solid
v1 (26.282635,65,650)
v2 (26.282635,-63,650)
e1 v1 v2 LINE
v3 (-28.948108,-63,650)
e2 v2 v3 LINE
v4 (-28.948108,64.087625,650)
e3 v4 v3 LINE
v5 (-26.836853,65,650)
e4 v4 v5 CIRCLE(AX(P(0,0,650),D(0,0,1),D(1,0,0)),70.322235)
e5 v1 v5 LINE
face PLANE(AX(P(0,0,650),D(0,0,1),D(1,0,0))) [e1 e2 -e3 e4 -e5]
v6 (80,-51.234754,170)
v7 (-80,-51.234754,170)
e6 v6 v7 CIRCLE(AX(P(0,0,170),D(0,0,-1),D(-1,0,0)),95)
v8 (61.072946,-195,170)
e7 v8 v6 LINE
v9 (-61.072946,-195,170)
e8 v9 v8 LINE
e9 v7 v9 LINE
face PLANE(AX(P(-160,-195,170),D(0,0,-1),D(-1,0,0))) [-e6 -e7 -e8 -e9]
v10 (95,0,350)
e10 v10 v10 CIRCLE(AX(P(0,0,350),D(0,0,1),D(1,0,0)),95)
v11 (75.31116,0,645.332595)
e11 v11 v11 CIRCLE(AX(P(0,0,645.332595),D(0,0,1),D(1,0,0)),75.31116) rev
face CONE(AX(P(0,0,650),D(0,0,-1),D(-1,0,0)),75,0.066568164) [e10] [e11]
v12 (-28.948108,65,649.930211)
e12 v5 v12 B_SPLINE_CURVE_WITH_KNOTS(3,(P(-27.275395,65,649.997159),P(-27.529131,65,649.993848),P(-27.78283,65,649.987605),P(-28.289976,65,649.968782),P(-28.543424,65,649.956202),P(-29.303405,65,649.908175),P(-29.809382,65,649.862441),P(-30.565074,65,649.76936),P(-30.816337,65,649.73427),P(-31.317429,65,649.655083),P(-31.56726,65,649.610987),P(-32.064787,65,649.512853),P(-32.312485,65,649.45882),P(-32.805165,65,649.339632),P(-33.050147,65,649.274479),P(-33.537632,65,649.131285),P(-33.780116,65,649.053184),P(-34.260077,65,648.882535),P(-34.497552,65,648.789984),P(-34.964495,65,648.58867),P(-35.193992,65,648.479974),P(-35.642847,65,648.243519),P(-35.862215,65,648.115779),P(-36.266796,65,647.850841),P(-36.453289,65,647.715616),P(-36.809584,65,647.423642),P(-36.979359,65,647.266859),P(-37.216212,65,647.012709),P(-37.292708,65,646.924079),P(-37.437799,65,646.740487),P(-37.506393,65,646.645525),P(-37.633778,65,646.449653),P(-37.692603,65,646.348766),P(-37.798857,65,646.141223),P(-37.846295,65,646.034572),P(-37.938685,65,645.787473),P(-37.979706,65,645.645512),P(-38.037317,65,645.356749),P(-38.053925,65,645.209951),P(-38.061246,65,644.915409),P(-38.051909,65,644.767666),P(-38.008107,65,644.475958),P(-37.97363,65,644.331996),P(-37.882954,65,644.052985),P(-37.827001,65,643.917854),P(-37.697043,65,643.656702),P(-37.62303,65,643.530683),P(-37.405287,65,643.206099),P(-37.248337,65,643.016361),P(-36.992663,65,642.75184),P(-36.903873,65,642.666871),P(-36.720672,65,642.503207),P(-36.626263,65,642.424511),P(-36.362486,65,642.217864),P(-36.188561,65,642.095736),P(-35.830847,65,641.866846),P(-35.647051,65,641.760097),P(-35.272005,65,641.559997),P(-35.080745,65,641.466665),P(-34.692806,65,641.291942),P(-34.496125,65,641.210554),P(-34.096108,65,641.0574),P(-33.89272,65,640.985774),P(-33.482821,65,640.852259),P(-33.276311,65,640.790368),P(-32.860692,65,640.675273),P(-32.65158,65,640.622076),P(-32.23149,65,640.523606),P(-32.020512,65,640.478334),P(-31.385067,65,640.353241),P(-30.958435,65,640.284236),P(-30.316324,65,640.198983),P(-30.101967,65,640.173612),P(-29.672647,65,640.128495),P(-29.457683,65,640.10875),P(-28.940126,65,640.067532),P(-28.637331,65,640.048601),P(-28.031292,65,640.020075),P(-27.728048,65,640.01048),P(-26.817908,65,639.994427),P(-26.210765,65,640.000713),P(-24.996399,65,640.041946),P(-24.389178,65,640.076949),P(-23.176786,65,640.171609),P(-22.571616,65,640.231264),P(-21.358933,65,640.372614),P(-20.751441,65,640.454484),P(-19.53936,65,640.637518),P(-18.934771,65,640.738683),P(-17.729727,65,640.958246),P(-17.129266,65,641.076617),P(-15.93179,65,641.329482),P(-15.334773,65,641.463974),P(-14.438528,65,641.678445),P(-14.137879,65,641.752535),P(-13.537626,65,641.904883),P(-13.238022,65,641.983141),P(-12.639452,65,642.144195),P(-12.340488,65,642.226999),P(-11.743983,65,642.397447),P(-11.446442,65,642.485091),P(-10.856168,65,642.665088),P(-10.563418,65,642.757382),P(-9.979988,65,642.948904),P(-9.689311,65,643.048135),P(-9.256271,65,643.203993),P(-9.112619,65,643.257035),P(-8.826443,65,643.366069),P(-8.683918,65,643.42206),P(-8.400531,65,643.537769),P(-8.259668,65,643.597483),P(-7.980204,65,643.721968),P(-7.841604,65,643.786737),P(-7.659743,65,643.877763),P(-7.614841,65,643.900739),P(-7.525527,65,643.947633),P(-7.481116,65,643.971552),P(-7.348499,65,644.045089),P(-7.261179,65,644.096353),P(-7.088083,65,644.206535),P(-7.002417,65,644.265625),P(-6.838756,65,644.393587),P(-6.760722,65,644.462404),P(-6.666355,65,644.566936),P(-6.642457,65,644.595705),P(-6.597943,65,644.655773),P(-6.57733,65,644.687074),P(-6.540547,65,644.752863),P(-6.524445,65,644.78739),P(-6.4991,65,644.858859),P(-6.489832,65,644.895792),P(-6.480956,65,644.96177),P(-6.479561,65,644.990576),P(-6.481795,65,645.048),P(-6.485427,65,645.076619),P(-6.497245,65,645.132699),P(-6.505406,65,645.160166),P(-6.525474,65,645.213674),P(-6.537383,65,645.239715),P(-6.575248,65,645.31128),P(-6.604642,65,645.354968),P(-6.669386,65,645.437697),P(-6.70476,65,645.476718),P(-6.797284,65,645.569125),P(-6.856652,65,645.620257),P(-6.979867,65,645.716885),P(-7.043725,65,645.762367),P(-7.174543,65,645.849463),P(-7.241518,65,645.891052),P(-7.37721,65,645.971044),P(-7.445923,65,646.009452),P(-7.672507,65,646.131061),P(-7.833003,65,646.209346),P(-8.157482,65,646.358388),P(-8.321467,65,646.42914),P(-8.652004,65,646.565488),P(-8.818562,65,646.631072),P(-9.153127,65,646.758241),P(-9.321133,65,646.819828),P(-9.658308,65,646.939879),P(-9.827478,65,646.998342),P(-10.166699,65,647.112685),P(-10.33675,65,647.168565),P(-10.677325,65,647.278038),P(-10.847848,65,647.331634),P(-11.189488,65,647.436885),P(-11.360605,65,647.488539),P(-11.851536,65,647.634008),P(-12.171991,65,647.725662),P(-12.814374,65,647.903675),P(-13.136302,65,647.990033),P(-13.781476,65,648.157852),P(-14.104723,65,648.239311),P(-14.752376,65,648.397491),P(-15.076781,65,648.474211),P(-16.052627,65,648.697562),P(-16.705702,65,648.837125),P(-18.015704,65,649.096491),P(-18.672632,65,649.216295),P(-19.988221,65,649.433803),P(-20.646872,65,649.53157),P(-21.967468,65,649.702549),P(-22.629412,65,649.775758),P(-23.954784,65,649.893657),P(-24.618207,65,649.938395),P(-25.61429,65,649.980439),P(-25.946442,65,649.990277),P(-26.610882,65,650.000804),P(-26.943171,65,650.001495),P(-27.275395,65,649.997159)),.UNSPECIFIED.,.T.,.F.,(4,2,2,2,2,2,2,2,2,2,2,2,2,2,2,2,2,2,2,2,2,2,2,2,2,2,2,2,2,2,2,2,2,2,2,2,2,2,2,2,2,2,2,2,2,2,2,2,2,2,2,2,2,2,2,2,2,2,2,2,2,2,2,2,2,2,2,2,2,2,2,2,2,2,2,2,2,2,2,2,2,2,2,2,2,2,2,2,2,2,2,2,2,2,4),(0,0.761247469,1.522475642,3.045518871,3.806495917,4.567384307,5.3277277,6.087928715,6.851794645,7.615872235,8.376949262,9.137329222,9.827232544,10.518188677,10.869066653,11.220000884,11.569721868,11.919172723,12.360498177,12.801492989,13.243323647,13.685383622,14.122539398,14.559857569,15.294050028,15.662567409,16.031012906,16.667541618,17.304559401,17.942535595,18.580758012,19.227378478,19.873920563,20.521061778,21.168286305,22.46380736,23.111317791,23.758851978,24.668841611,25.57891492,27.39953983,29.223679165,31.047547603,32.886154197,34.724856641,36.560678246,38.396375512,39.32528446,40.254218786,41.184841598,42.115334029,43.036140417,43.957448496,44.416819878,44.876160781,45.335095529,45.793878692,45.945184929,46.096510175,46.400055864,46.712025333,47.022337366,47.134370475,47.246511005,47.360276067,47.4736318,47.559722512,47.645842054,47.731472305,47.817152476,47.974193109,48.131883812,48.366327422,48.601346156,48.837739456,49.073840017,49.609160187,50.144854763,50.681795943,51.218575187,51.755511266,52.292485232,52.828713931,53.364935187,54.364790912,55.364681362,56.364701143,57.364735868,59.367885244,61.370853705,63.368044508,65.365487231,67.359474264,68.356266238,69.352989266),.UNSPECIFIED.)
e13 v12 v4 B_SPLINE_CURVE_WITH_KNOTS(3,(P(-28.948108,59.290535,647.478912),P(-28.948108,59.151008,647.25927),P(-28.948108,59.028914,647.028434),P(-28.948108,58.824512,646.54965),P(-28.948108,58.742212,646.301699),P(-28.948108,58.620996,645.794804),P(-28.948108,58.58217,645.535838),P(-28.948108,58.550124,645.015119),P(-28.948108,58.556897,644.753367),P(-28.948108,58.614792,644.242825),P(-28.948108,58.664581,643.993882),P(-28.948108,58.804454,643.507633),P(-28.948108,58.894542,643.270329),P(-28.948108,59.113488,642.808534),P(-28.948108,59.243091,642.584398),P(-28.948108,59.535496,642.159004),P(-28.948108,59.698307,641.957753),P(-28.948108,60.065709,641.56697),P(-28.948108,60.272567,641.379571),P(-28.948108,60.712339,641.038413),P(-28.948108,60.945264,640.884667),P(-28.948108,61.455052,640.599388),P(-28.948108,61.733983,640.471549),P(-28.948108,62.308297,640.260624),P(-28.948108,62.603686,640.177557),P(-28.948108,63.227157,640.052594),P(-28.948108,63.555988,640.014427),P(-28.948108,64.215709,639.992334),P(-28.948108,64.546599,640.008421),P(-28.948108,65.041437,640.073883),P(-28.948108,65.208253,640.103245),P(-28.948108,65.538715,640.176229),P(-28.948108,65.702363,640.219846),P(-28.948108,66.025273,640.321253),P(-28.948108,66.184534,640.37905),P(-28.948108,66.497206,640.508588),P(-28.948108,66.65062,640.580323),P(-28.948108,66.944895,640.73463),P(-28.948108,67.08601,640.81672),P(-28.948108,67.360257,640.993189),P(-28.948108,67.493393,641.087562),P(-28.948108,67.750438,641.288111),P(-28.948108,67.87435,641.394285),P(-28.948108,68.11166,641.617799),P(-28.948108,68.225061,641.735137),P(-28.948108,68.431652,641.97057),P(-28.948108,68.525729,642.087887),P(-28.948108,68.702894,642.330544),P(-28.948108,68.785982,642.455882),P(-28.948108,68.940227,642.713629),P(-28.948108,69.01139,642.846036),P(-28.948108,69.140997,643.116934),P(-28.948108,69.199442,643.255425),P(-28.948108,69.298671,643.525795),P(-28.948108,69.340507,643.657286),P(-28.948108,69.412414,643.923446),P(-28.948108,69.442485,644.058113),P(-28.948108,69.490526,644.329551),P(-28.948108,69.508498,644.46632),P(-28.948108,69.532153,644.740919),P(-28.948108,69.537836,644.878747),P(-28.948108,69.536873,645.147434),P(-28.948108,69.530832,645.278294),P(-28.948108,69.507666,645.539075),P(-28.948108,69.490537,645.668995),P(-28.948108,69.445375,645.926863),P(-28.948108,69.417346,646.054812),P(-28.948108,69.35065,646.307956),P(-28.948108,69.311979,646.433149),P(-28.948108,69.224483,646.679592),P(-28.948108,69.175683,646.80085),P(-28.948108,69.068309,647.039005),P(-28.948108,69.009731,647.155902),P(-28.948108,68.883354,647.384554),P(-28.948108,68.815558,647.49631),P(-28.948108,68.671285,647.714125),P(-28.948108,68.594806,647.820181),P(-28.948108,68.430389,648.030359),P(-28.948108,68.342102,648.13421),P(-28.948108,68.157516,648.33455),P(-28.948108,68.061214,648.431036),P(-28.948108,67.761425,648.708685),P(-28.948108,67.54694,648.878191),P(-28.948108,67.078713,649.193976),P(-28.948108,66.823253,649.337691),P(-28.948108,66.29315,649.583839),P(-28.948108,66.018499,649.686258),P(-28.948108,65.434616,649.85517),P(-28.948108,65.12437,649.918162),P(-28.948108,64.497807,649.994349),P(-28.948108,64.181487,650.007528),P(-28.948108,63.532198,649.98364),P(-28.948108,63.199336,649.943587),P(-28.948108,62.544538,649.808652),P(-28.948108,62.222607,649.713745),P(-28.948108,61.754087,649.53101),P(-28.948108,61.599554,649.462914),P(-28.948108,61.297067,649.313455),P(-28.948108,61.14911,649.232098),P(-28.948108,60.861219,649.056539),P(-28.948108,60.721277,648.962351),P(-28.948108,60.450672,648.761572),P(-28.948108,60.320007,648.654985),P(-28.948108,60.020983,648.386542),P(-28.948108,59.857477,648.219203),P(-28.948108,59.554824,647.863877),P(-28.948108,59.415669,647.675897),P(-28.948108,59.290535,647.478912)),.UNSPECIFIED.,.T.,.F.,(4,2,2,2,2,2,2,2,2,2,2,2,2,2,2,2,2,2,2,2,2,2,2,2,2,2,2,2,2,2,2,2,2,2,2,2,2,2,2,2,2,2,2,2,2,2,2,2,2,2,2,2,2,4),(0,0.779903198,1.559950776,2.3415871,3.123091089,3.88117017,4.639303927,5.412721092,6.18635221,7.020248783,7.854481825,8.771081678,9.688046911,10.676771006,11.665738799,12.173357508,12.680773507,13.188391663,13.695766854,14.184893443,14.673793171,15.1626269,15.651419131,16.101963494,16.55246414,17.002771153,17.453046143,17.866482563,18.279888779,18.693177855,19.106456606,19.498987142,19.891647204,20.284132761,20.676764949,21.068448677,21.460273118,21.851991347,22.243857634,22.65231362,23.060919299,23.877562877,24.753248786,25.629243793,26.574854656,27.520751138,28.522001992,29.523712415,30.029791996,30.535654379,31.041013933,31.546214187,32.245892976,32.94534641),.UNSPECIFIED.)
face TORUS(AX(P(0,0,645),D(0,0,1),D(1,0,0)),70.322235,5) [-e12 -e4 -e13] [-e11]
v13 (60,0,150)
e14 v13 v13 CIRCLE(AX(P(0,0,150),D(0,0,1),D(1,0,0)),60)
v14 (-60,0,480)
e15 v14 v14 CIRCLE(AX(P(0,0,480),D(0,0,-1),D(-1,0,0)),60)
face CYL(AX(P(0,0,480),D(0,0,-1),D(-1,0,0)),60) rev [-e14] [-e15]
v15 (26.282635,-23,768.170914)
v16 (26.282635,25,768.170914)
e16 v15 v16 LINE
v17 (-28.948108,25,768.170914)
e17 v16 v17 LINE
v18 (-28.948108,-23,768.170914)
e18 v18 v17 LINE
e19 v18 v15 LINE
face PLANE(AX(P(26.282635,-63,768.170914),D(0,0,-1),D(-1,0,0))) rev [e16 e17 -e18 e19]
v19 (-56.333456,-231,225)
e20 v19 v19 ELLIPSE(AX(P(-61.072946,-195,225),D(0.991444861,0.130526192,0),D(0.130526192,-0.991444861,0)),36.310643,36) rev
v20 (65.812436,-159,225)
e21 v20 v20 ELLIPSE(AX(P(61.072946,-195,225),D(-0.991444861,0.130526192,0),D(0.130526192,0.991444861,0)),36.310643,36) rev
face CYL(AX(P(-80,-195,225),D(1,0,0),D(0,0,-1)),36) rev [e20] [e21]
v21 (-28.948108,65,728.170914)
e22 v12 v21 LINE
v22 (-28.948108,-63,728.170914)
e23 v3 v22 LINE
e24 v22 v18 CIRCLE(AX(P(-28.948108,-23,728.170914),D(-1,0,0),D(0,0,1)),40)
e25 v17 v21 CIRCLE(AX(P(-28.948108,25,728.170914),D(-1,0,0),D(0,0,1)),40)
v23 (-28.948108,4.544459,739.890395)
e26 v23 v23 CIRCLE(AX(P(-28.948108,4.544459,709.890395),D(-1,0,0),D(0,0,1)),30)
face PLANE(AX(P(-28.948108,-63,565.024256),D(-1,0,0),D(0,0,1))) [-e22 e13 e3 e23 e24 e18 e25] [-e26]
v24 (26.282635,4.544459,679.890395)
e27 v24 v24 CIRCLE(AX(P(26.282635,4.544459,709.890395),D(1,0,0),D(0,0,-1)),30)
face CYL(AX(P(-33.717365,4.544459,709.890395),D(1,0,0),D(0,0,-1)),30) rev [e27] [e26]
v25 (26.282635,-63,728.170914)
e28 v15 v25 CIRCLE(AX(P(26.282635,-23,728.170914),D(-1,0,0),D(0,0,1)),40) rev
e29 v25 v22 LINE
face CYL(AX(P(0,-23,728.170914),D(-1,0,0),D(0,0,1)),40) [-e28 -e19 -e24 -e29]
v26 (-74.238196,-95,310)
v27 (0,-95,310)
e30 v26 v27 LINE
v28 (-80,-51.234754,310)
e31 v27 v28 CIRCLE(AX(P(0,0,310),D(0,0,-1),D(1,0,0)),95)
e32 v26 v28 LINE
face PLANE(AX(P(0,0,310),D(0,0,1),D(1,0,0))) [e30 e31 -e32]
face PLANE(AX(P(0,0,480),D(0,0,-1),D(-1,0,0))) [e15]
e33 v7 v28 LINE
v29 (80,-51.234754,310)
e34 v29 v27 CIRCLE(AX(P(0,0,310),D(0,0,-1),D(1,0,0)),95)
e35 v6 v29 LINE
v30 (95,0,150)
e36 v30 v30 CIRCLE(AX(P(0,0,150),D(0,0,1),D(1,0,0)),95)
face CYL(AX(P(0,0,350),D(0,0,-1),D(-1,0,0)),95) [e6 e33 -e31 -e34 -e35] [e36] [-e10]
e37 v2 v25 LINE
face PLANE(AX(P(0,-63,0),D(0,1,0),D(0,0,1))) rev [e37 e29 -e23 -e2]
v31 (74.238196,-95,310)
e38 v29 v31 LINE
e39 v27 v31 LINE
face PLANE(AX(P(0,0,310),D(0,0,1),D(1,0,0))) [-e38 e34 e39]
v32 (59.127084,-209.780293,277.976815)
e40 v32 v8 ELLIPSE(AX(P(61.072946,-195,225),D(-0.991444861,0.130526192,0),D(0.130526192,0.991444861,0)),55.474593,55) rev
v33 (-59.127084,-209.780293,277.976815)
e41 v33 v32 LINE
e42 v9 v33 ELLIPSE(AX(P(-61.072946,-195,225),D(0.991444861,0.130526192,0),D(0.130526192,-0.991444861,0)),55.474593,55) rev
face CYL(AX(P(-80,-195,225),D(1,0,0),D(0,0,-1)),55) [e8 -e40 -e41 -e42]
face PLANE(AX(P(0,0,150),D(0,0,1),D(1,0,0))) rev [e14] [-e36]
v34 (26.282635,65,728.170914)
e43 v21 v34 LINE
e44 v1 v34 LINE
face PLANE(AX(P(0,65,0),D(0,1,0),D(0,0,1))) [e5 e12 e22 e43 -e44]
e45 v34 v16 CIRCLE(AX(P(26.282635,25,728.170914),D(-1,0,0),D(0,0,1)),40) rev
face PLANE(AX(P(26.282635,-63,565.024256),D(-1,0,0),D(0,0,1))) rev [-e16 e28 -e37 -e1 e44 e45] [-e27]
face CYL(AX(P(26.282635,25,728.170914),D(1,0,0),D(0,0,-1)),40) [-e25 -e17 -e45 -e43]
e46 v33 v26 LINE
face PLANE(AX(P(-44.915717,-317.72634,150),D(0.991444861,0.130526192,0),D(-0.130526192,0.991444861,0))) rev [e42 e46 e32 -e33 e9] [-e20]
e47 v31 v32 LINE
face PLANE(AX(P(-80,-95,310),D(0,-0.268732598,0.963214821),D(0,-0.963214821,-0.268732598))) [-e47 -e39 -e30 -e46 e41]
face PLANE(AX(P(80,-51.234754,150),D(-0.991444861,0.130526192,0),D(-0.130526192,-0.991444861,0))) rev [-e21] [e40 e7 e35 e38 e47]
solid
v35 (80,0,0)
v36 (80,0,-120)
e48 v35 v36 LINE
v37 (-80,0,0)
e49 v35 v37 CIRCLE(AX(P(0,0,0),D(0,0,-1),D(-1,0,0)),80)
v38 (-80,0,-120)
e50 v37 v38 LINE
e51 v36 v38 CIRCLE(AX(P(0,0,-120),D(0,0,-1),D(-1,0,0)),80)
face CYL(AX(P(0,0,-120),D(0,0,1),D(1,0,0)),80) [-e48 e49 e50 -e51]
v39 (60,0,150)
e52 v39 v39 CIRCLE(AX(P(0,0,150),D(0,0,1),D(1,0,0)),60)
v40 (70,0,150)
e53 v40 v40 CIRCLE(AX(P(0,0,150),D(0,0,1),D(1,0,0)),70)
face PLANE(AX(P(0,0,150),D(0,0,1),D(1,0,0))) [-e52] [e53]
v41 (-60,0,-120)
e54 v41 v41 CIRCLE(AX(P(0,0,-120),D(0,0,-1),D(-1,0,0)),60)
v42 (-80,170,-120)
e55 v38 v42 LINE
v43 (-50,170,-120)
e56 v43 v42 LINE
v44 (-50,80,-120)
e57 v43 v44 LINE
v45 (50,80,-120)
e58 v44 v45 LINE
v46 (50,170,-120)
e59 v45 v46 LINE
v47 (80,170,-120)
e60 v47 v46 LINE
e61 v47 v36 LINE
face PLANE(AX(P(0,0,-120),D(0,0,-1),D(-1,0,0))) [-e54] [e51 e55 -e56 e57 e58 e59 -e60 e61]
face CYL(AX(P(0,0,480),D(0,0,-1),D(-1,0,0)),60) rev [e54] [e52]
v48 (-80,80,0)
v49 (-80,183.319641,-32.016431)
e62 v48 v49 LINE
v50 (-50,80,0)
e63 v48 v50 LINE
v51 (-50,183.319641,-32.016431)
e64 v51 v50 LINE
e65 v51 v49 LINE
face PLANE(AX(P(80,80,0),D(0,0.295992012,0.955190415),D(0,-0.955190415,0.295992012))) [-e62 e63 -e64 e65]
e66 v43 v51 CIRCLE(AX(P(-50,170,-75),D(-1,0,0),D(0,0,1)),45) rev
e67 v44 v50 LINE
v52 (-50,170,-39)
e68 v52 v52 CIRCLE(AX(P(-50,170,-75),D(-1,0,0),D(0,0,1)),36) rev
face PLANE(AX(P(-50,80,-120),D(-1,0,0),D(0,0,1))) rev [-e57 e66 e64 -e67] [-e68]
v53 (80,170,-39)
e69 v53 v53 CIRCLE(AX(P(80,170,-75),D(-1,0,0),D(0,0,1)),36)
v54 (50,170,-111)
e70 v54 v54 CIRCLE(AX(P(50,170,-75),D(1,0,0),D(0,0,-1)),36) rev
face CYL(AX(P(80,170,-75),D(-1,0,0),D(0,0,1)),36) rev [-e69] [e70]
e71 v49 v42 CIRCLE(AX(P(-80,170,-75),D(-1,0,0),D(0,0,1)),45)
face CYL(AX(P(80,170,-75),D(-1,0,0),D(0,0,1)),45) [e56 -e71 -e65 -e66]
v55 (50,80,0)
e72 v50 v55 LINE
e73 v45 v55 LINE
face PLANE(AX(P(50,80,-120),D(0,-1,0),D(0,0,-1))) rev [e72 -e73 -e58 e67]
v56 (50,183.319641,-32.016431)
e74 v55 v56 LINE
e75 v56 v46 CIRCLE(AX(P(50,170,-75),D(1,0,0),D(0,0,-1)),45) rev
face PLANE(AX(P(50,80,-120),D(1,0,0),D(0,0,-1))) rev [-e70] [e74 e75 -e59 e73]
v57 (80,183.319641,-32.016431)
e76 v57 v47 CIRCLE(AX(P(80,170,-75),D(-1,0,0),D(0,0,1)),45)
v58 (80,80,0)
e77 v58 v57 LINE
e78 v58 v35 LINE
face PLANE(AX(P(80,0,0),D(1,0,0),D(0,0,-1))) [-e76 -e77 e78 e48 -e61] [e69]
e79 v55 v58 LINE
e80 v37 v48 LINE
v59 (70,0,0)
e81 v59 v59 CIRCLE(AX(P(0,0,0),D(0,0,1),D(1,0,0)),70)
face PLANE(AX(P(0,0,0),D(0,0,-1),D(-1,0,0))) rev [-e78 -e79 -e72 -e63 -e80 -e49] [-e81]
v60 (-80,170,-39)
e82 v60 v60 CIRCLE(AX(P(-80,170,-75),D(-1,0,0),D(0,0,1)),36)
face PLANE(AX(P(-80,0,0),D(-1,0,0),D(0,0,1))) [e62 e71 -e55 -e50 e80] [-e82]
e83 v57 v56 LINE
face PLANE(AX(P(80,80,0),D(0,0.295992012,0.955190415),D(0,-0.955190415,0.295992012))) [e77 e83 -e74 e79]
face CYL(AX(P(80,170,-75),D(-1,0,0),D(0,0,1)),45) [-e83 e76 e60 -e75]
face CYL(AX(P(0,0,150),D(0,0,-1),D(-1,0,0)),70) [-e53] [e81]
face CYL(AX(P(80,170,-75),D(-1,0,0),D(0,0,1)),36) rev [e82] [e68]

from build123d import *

# Parameters (mm, degrees)
SKETCH1_R                 = 70
BOSS_EXTRUDE1_DEPTH       = 150
SKETCH2_R                 = 80
BOSS_EXTRUDE2_DEPTH       = 120
SKETCH4_R                 = 95
BOSS_EXTRUDE3_DEPTH       = 200
FILLET1_R                 = 5
BOSS_EXTRUDE6_START       = -120
BOSS_EXTRUDE6_DEPTH       = 120
BOSS_EXTRUDE7_DEPTH       = 160
SKETCH17_R                = 36
CUT_EXTRUDE3_DEPTH        = 160
BOSS_EXTRUDE8_DEPTH       = 160
BOSS_EXTRUDE8_DEPTH_BACK  = 160
CUT_EXTRUDE4_DEPTH        = 503.444026818
BOSS_EXTRUDE10_DEPTH      = 85
BOSS_EXTRUDE11_DEPTH      = 160
BOSS_EXTRUDE12_DEPTH      = 160
CUT_EXTRUDE5_DEPTH        = 719.070330908
CUT_EXTRUDE5_DEPTH_BACK   = 160
SKETCH30_R                = 36
CUT_EXTRUDE6_DEPTH        = 160
CUT_EXTRUDE7_DEPTH        = 160
SKETCH15_R                = 60
CUT_EXTRUDE8_DEPTH        = 600
SKETCH33_W                = 100
SKETCH33_H                = 210.970311261
CUT_EXTRUDE9_DEPTH        = 703.869120199
BOSS_EXTRUDE13_DEPTH      = 65
BOSS_EXTRUDE13_DEPTH_BACK = 63
SKETCH35_W                = 55.230742861
SKETCH35_H                = 203.146658785
FILLET2_R                 = 40
HOLE2_START               = -28.948107879
HOLE2_OUTLINE_R           = 30
HOLE2_DEPTH               = 55.230742861


# Read off the part's stored shape, not the designer's step: Hole2
with BuildPart() as part:
    # Sketch1 → Boss-Extrude1 (new body)
    with BuildSketch(Plane.XY):
        Circle(SKETCH1_R)
    extrude(amount=BOSS_EXTRUDE1_DEPTH)

    # Sketch2 → Boss-Extrude2 (add)
    with BuildSketch(Plane(origin=(0, 0, 0), x_dir=(-1, 0, 0), z_dir=(0, 0, -1))):
        Circle(SKETCH2_R)
    extrude(amount=BOSS_EXTRUDE2_DEPTH)

    # Sketch14 → Boss-Extrude6 (add)
    with BuildSketch(Plane(origin=(0, 0, -120), x_dir=(-1, 0, 0), z_dir=(0, 0, -1)).offset(BOSS_EXTRUDE6_START)):
        with BuildLine():
            Line((-80, 0), (-80, 80))
            Line((-80, 80), (80, 80))
            Line((80, 80), (80, 0))
            ThreePointArc((80, 0), (0, -80), (-80, 0))
        make_face()
    extrude(amount=BOSS_EXTRUDE6_DEPTH)

    # Sketch16 → Boss-Extrude7 (add)
    with BuildSketch(Plane.ZY.offset(80)):
        with BuildLine():
            Line((-120, 80), (-120, 170))
            ThreePointArc((-120, 170), (-81.735703747, 214.493036478), (-32.016431332, 183.319640557))
            Line((-32.016431332, 183.319640557), (0, 80))
            Line((0, 80), (-120, 80))
        make_face()
    extrude(amount=-BOSS_EXTRUDE7_DEPTH)

    # Sketch17 → Cut-Extrude3 (cut)
    with BuildSketch(Plane.ZY.offset(80)):
        with Locations((-75, 170)):
            Circle(SKETCH17_R)
    extrude(amount=-CUT_EXTRUDE3_DEPTH, mode=Mode.SUBTRACT)


with BuildPart() as body_2:
    # Sketch4 → Boss-Extrude3 (new body)
    with BuildSketch(Plane.XY.offset(150)):
        Circle(SKETCH4_R)
    extrude(amount=BOSS_EXTRUDE3_DEPTH)

    # Sketch5 → Revolve1 (revolve)
    with BuildSketch(Plane(origin=(0, 0, 0), x_dir=(1, 0, 0), z_dir=(0, 1, 0))):
        Polygon((0, -650), (75, -650), (95, -350), (0, -350), align=None)
    revolve(axis=Axis((0, 0, 317.027176581), (0, 0, -1)))

    # Fillet1
    fillet1_edges = [body_2.edges().sort_by_distance(p)[0] for p in [
        (-75, 0, 650),
    ]]
    fillet(fillet1_edges, radius=FILLET1_R)

    # Sketch18 → Boss-Extrude8 (add, two sides: drawn at the far end of the back side and taken through both)
    with BuildSketch(Plane(origin=(0, 0, 0), x_dir=(0, 0, -1), z_dir=(1, 0, 0)).offset(-BOSS_EXTRUDE8_DEPTH_BACK)):
        Polygon((-225, -95), (-225, 0), (-170, 0), (-170, -95), (-170, -195), (-225, -195), align=None)
    extrude(amount=BOSS_EXTRUDE8_DEPTH + BOSS_EXTRUDE8_DEPTH_BACK)

    # Sketch19 → Cut-Extrude4 (cut, through all)
    with BuildSketch(Plane.XY.offset(225)):
        with BuildLine():
            Line((-80, -51.23475383), (-80, -195))
            Line((-80, -195), (-160, -195))
            Line((-160, -195), (-160, 0))
            Line((-160, 0), (-95, 0))
            ThreePointArc((-95, 0), (-91.172912644, -26.69269563), (-80, -51.23475383))
        make_face()
        with BuildLine():
            Line((80, -51.23475383), (80, -195))
            Line((80, -195), (160, -195))
            Line((160, -195), (160, 0))
            Line((160, 0), (95, 0))
            ThreePointArc((95, 0), (91.172912644, -26.69269563), (80, -51.23475383))
        make_face()
    extrude(amount=-CUT_EXTRUDE4_DEPTH, mode=Mode.SUBTRACT)

    # Sketch23 → Boss-Extrude10 (add)
    with BuildSketch(Plane.XY.offset(225)):
        with BuildLine():
            Line((80, -51.23475383), (80, -195))
            Line((80, -195), (-80, -195))
            Line((-80, -195), (-80, -51.23475383))
            ThreePointArc((-80, -51.23475383), (0, -95), (80, -51.23475383))
        make_face()
    extrude(amount=BOSS_EXTRUDE10_DEPTH)

    # Sketch24 → Boss-Extrude11 (add)
    with BuildSketch(Plane(origin=(80, 0, 0), x_dir=(0, 0, -1), z_dir=(1, 0, 0))):
        with BuildLine():
            ThreePointArc((-280, -195), (-225, -250), (-170, -195))
            Line((-170, -195), (-225, -195))
            Line((-225, -195), (-280, -195))
        make_face()
        with BuildLine():
            Line((-225, -195), (-170, -195))
            ThreePointArc((-170, -195), (-225, -140), (-280, -195))
            Line((-280, -195), (-225, -195))
        make_face()
    extrude(amount=-BOSS_EXTRUDE11_DEPTH)

    # Sketch28 → Boss-Extrude12 (add)
    with BuildSketch(Plane(origin=(80, 0, 0), x_dir=(0, 0, -1), z_dir=(1, 0, 0))):
        with BuildLine():
            Line((-310, -95), (-277.976815143, -209.780292871))
            ThreePointArc((-277.976815143, -209.780292871), (-217.540939497, -249.491856423), (-170, -195))
            Line((-170, -195), (-170, -95))
            Line((-170, -95), (-310, -95))
        make_face()
    extrude(amount=-BOSS_EXTRUDE12_DEPTH)

    # Sketch29 → Cut-Extrude5 (cut, two sides: drawn at the far end of the back side and taken through both)
    with BuildSketch(Plane(origin=(80, 0, 0), x_dir=(0, 0, -1), z_dir=(1, 0, 0)).offset(-CUT_EXTRUDE5_DEPTH_BACK)):
        Polygon((-310, -95), (-277.976815143, -209.780292871), (-310, -218.714617247), align=None)
    extrude(amount=CUT_EXTRUDE5_DEPTH + CUT_EXTRUDE5_DEPTH_BACK, mode=Mode.SUBTRACT)

    # Sketch30 → Cut-Extrude6 (cut)
    with BuildSketch(Plane(origin=(80, 0, 0), x_dir=(0, 0, -1), z_dir=(1, 0, 0))):
        with Locations((-225, -195)):
            Circle(SKETCH30_R)
    extrude(amount=-CUT_EXTRUDE6_DEPTH, mode=Mode.SUBTRACT)

    # Sketch31 → Cut-Extrude7 (cut)
    with BuildSketch(Plane.XY.offset(310)):
        Polygon((80, -51.23475383), (80, -287.857028933), (48.848086498, -287.857028933), align=None)
        Polygon((-80, -51.23475383), (-80, -317.726340354), (-44.915717048, -317.726340354), align=None)
    extrude(amount=-CUT_EXTRUDE7_DEPTH, mode=Mode.SUBTRACT)


with BuildPart() as cut_extrude8_tool:
    # Sketch15 → Cut-Extrude8 (new body)
    with BuildSketch(Plane(origin=(0, 0, -120), x_dir=(-1, 0, 0), z_dir=(0, 0, -1))):
        Circle(SKETCH15_R)
    extrude(amount=-CUT_EXTRUDE8_DEPTH)


with BuildPart() as part_1:
    add(part.part)

    # Cut-Extrude8: cut by cut_extrude8_tool
    add(cut_extrude8_tool.part, mode=Mode.SUBTRACT)

    # Sketch33 → Cut-Extrude9 (cut, through all)
    with BuildSketch(Plane.XY):
        with Locations((0, 185.485155631)):
            Rectangle(SKETCH33_W, SKETCH33_H)
    extrude(amount=-CUT_EXTRUDE9_DEPTH, mode=Mode.SUBTRACT)


with BuildPart() as body_2_1:
    add(body_2.part)

    # Cut-Extrude8: cut by cut_extrude8_tool
    add(cut_extrude8_tool.part, mode=Mode.SUBTRACT)

    # Sketch35 → Boss-Extrude13 (add, two sides: drawn at the far end of the back side and taken through both)
    with BuildSketch(Plane(origin=(18.029813756, 0, 0), x_dir=(1, 0, 0), z_dir=(0, 1, 0)).offset(-BOSS_EXTRUDE13_DEPTH_BACK)):
        with Locations((-19.362550204, -666.59758502)):
            Rectangle(SKETCH35_W, SKETCH35_H)
    extrude(amount=BOSS_EXTRUDE13_DEPTH + BOSS_EXTRUDE13_DEPTH_BACK)

    # Fillet2
    fillet2_edges = [body_2_1.edges().sort_by_distance(p)[0] for p in [
        (-1.332736449, 65, 768.170914413),
        (-1.332736449, -63, 768.170914413),
    ]]
    fillet(fillet2_edges, radius=FILLET2_R)

    # Hole2 outline → Hole2 (cut)
    with BuildSketch(Plane.YZ.offset(HOLE2_START)):
        with Locations((4.544458714, 709.89039504)):
            Circle(HOLE2_OUTLINE_R)
    extrude(amount=HOLE2_DEPTH, mode=Mode.SUBTRACT)


solid = Compound([part_1.part, body_2_1.part])
